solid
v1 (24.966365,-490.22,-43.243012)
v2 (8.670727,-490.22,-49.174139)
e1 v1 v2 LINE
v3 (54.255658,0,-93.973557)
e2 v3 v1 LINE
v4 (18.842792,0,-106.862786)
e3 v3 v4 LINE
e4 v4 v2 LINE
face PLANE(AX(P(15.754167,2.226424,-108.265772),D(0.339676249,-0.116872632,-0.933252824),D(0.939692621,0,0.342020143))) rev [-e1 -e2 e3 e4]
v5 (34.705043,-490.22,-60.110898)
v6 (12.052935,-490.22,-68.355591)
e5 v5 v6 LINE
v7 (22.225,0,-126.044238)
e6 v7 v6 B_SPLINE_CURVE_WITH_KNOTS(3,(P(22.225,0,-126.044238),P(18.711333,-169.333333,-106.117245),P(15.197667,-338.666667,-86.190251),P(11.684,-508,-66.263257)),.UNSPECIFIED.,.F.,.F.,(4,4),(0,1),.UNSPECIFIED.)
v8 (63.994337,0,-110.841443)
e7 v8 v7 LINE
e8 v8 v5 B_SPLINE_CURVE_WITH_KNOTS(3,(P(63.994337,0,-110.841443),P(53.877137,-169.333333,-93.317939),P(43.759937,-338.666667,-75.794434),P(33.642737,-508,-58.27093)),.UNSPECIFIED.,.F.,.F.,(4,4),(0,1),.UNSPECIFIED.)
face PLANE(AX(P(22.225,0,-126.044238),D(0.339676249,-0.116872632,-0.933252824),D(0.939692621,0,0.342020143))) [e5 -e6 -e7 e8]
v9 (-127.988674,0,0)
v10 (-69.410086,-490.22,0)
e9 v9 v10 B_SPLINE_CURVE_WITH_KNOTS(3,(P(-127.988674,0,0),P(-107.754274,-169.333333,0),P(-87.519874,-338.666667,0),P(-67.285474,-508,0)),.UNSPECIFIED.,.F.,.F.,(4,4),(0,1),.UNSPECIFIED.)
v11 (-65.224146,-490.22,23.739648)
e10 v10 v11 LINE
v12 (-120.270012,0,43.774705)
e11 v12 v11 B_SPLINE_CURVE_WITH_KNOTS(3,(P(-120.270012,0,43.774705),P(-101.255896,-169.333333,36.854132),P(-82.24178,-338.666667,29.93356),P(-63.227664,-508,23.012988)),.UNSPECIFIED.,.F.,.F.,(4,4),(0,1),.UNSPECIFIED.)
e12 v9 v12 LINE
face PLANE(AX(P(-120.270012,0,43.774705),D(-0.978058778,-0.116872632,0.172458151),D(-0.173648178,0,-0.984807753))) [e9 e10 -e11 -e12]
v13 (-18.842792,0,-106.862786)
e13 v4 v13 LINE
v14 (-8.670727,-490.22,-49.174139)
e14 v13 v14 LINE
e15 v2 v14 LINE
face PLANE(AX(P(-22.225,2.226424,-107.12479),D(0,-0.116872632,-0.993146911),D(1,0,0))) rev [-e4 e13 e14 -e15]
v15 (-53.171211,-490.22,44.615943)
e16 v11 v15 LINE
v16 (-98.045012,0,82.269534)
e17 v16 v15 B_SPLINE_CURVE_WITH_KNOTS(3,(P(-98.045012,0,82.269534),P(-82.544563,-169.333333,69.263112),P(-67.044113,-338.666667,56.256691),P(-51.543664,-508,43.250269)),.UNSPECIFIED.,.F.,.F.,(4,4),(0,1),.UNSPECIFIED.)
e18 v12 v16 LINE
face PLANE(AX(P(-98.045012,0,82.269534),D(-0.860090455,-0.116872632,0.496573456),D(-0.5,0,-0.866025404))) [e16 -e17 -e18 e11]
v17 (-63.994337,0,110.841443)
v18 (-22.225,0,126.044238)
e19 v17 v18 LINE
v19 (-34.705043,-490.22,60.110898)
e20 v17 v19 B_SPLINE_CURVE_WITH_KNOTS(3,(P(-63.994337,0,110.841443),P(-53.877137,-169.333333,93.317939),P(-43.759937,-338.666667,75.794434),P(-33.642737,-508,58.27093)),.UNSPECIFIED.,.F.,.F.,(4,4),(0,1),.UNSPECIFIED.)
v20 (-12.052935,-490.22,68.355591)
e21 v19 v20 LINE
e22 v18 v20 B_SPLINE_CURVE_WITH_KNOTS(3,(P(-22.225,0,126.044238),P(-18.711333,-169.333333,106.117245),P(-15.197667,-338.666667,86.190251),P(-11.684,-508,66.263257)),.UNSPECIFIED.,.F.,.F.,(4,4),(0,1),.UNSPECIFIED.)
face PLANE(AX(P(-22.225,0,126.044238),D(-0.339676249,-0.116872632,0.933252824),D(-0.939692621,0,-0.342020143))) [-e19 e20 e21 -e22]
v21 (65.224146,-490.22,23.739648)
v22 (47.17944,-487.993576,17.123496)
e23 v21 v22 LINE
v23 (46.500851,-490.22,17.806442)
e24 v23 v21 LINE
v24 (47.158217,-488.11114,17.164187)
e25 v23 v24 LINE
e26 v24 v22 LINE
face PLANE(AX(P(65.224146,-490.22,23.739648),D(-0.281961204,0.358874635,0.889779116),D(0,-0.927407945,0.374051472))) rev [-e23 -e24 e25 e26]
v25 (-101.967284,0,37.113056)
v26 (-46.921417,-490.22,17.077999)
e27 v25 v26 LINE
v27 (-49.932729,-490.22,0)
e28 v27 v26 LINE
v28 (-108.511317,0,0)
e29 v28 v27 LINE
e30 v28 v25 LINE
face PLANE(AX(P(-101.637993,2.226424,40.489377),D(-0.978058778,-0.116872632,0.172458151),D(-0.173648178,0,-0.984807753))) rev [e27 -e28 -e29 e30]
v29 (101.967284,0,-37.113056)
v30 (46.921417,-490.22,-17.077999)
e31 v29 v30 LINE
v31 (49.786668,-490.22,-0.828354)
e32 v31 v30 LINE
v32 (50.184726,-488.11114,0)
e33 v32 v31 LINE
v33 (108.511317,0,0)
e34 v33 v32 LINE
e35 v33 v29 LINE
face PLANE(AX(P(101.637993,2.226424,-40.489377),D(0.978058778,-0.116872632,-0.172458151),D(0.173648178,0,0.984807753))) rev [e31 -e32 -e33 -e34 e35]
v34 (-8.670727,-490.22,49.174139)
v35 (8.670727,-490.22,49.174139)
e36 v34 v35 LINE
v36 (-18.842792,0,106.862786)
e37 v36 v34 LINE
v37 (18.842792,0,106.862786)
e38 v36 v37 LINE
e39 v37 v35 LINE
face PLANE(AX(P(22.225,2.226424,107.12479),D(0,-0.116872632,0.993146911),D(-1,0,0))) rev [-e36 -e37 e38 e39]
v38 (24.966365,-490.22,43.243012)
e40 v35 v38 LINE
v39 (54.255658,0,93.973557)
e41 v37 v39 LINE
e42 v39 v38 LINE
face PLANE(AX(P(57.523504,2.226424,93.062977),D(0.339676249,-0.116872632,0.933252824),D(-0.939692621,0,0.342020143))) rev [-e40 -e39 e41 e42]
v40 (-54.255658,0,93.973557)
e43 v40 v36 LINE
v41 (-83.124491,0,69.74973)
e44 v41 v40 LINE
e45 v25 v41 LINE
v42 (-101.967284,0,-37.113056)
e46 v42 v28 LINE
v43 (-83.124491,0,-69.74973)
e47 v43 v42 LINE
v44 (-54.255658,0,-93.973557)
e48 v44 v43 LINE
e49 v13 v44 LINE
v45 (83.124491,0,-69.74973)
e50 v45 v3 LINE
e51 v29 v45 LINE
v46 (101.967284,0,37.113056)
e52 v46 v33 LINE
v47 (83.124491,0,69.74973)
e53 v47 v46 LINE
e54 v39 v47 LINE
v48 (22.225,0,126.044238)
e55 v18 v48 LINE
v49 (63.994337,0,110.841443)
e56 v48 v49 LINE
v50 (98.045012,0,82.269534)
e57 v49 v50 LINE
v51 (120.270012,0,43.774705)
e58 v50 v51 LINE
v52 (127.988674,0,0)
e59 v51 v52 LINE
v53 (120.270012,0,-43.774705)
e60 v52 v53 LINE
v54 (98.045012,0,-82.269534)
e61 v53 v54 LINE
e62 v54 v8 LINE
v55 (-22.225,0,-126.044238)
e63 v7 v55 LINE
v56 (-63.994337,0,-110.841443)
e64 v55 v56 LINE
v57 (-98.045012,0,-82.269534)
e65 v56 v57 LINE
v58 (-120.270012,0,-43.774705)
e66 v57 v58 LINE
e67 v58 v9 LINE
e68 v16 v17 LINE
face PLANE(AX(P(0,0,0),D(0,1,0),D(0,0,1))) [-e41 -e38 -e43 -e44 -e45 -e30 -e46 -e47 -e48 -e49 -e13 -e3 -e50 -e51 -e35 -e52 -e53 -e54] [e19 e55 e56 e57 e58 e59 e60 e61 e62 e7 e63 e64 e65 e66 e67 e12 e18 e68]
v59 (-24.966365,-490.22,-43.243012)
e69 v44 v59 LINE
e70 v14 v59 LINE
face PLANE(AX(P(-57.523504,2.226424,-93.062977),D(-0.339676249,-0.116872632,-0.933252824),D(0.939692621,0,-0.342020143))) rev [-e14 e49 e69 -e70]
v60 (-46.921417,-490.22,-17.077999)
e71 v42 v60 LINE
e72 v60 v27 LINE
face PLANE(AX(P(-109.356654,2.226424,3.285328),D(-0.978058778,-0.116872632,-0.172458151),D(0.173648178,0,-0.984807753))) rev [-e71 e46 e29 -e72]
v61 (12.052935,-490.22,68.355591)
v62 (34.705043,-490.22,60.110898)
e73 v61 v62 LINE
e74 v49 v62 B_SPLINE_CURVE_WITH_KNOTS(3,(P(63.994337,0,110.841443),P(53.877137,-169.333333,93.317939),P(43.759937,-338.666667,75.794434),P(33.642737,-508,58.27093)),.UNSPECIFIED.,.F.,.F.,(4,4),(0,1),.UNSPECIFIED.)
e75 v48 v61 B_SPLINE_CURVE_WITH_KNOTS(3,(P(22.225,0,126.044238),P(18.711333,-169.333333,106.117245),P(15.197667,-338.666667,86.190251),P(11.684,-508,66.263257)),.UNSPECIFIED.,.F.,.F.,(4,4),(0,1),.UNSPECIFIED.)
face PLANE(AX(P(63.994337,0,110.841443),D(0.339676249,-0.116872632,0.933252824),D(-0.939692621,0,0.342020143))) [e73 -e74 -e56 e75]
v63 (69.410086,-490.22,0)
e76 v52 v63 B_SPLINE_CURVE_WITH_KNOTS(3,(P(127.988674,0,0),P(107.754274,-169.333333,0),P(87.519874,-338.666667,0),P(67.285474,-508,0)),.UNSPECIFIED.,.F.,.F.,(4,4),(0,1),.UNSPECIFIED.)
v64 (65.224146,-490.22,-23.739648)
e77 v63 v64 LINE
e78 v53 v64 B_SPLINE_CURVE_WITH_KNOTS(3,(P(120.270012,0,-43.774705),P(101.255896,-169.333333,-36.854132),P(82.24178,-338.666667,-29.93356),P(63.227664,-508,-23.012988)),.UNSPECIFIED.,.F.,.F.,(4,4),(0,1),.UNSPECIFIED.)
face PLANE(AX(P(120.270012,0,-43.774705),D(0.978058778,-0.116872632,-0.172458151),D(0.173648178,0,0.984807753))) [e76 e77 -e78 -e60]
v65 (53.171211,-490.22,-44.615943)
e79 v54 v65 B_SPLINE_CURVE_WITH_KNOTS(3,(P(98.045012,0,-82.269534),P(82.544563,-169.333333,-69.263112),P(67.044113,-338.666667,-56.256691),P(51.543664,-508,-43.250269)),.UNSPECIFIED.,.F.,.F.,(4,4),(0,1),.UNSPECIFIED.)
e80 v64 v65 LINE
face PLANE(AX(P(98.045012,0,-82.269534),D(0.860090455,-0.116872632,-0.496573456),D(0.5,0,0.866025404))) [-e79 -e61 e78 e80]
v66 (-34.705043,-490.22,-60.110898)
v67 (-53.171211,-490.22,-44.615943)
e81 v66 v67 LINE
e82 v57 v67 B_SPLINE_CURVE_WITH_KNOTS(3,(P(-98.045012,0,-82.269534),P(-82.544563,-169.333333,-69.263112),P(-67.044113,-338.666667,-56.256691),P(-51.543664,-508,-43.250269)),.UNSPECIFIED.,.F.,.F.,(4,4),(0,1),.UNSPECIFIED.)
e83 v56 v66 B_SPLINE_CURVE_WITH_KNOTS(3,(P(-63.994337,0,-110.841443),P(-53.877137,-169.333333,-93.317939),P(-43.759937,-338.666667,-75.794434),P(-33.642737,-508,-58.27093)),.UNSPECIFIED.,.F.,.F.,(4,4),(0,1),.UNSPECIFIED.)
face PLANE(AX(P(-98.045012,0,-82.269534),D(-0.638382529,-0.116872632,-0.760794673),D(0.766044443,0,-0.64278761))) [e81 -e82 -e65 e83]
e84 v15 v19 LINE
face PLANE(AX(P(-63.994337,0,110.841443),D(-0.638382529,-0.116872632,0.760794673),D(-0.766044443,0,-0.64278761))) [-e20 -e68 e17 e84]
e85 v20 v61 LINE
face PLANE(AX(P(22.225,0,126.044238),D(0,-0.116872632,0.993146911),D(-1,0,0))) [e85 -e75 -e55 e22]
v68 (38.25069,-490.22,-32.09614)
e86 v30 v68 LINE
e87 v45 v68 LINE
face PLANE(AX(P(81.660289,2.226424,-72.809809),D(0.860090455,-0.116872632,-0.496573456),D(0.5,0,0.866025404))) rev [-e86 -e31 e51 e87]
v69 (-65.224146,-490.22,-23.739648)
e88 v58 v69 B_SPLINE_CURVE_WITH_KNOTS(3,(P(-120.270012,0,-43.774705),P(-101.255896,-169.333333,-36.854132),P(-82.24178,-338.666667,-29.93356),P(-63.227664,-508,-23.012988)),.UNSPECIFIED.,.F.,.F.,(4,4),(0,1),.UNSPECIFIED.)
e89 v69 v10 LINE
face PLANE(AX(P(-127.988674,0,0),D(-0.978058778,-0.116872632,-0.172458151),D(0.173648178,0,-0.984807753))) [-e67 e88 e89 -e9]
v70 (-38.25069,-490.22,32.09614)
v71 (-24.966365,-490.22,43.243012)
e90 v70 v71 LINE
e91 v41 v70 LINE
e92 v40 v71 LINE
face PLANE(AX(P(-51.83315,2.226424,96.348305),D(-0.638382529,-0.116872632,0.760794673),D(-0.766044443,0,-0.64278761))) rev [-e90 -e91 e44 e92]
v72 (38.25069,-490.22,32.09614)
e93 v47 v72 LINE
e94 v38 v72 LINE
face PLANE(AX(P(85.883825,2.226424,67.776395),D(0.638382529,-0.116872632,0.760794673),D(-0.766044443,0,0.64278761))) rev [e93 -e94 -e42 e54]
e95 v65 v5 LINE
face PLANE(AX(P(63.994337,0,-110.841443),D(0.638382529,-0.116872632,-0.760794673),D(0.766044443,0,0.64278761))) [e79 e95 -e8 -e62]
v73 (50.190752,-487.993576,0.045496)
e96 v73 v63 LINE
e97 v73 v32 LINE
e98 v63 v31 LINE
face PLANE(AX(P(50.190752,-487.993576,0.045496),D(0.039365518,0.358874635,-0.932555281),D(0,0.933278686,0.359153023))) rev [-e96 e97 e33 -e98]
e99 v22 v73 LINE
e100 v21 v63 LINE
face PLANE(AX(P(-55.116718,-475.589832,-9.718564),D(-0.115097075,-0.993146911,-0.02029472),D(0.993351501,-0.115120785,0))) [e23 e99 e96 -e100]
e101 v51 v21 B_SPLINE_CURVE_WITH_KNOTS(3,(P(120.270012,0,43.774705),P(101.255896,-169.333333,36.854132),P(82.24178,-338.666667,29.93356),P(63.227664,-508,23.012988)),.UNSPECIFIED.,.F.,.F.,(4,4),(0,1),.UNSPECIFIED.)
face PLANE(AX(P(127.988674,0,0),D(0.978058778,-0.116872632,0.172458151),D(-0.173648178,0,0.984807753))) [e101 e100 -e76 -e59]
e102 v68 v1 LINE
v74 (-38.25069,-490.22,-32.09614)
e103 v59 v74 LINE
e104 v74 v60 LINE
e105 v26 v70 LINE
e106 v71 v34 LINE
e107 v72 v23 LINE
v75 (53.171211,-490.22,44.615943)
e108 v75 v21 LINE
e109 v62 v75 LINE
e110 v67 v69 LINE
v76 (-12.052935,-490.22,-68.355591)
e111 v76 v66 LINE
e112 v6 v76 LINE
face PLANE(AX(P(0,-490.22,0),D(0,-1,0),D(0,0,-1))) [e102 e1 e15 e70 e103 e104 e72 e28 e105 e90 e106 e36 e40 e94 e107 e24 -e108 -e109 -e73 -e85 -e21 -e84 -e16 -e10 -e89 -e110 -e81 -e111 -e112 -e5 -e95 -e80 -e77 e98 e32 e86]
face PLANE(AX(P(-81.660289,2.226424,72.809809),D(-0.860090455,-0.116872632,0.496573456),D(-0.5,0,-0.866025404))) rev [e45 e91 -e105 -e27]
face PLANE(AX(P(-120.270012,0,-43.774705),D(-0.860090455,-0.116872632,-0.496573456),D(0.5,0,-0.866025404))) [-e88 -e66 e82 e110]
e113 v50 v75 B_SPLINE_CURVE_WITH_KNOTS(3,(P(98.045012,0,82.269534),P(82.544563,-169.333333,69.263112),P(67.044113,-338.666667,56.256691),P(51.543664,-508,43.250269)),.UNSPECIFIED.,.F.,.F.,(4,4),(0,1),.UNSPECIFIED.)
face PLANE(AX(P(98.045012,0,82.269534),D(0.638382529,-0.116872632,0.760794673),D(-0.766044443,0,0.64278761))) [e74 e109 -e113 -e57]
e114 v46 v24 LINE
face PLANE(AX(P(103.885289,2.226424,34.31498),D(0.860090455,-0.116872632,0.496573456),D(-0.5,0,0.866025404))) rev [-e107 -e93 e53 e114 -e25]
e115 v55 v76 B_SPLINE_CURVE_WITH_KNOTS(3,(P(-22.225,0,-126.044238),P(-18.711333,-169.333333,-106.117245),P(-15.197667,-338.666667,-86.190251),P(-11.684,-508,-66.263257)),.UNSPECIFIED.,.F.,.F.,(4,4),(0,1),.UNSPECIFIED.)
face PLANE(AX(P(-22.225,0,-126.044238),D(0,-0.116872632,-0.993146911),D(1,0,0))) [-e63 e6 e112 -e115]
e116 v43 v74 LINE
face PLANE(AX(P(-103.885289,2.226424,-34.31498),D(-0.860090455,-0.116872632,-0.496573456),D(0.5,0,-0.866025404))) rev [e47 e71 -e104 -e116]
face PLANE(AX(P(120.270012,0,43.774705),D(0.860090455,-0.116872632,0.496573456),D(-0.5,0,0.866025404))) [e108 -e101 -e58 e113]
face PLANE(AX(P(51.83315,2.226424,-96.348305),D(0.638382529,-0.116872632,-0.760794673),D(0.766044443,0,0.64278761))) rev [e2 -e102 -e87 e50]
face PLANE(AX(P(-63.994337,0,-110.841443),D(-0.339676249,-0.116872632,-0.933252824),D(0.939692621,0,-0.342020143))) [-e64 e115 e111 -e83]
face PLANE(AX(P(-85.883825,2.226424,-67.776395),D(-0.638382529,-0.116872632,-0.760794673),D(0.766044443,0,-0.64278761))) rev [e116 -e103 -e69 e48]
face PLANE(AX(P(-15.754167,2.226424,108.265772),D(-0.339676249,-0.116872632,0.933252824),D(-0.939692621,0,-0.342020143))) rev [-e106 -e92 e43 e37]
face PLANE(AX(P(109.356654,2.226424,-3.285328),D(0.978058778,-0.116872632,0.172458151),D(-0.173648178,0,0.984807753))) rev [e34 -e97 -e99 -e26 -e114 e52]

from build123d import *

# Parameters (mm, degrees)
LOFT1_DEPTH        = 508
LOFT1_DRAFT        = -6.7116474
SHELL1_T           = -19.05
SKETCH5_R          = 147.867108762
CUT_EXTRUDE1_DEPTH = 17.78
CUT_EXTRUDE2_DEPTH = 528.39436013
CUT_EXTRUDE2_TAPER = -20


# Read off the part's stored shape, not the designer's step: Loft1
with BuildPart() as part:
    # Loft1 outline → Loft1 (with draft: the straight prism first)
    with BuildSketch(Plane(origin=(0, -508, 0), x_dir=(1, 0, 0), z_dir=(0, 1, 0))):
        Polygon((33.642737163, -58.270930071), (51.543663709, -43.250269208), (63.227663709, -23.012987572), (67.285474325, 0), (63.227663709, 23.012987572), (51.543663709, 43.250269208), (33.642737163, 58.270930071), (11.684, 66.26325678), (-11.684, 66.26325678), (-33.642737163, 58.270930071), (-51.543663709, 43.250269208), (-63.227663709, 23.012987572), (-67.285474325, 0), (-63.227663709, -23.012987572), (-51.543663709, -43.250269208), (-33.642737163, -58.270930071), (-11.684, -66.26325678), (11.684, -66.26325678), align=None)
    extrude(amount=LOFT1_DEPTH)
    # Loft1: the draft: its side faces are tilted about the plane it starts from
    loft1_sides = [part.faces().sort_by_distance(p)[0] for p in [
        (42.593200436, -254, 50.76059964),
        (57.385663709, -254, 33.13162839),
        (65.256569017, -254, 11.506493786),
        (65.256569017, -254, -11.506493786),
        (57.385663709, -254, -33.13162839),
        (42.593200436, -254, -50.76059964),
        (22.663368581, -254, -62.267093426),
        (0, -254, -66.26325678),
        (-22.663368582, -254, -62.267093426),
        (-42.593200436, -254, -50.76059964),
        (-57.385663709, -254, -33.13162839),
        (-65.256569017, -254, -11.506493786),
        (-65.256569017, -254, 11.506493786),
        (-57.385663709, -254, 33.13162839),
        (-42.593200436, -254, 50.76059964),
        (-22.663368581, -254, 62.267093426),
        (0, -254, 66.26325678),
        (22.663368582, -254, 62.267093426),
    ]]
    draft(loft1_sides, Plane(origin=(0, -508, 0), x_dir=(1, 0, 0), z_dir=(0, 1, 0)), LOFT1_DRAFT)

    # Shell1
    shell1_openings = [part.faces().sort_by_distance(p)[0] for p in [
        (0, 0, 0),
        (0, -508, 0),
    ]]
    offset(amount=SHELL1_T, openings=shell1_openings, kind=Kind.INTERSECTION)

    # Sketch5 → Cut-Extrude1 (cut)
    with BuildSketch(Plane.XZ.offset(508)):
        Circle(SKETCH5_R)
    extrude(amount=-CUT_EXTRUDE1_DEPTH, mode=Mode.SUBTRACT)

    # Sketch6 → Cut-Extrude2 (cut, through all)
    with BuildSketch(Plane(origin=(-55.116718082, -475.589831727, -9.718564486), x_dir=(0.17364817766692822, 0, -0.9848077530122085), z_dir=(-0.11509707458405294, -0.9931469114771136, -0.020294719649782803))):
        Polygon((-12.052935, 125.180446117), (-8.67072745, 106.130446117), (8.67072745, 106.130446117), (12.052935, 125.180446117), align=None)
    extrude(amount=CUT_EXTRUDE2_DEPTH, taper=CUT_EXTRUDE2_TAPER, mode=Mode.SUBTRACT)


solid = part.part
